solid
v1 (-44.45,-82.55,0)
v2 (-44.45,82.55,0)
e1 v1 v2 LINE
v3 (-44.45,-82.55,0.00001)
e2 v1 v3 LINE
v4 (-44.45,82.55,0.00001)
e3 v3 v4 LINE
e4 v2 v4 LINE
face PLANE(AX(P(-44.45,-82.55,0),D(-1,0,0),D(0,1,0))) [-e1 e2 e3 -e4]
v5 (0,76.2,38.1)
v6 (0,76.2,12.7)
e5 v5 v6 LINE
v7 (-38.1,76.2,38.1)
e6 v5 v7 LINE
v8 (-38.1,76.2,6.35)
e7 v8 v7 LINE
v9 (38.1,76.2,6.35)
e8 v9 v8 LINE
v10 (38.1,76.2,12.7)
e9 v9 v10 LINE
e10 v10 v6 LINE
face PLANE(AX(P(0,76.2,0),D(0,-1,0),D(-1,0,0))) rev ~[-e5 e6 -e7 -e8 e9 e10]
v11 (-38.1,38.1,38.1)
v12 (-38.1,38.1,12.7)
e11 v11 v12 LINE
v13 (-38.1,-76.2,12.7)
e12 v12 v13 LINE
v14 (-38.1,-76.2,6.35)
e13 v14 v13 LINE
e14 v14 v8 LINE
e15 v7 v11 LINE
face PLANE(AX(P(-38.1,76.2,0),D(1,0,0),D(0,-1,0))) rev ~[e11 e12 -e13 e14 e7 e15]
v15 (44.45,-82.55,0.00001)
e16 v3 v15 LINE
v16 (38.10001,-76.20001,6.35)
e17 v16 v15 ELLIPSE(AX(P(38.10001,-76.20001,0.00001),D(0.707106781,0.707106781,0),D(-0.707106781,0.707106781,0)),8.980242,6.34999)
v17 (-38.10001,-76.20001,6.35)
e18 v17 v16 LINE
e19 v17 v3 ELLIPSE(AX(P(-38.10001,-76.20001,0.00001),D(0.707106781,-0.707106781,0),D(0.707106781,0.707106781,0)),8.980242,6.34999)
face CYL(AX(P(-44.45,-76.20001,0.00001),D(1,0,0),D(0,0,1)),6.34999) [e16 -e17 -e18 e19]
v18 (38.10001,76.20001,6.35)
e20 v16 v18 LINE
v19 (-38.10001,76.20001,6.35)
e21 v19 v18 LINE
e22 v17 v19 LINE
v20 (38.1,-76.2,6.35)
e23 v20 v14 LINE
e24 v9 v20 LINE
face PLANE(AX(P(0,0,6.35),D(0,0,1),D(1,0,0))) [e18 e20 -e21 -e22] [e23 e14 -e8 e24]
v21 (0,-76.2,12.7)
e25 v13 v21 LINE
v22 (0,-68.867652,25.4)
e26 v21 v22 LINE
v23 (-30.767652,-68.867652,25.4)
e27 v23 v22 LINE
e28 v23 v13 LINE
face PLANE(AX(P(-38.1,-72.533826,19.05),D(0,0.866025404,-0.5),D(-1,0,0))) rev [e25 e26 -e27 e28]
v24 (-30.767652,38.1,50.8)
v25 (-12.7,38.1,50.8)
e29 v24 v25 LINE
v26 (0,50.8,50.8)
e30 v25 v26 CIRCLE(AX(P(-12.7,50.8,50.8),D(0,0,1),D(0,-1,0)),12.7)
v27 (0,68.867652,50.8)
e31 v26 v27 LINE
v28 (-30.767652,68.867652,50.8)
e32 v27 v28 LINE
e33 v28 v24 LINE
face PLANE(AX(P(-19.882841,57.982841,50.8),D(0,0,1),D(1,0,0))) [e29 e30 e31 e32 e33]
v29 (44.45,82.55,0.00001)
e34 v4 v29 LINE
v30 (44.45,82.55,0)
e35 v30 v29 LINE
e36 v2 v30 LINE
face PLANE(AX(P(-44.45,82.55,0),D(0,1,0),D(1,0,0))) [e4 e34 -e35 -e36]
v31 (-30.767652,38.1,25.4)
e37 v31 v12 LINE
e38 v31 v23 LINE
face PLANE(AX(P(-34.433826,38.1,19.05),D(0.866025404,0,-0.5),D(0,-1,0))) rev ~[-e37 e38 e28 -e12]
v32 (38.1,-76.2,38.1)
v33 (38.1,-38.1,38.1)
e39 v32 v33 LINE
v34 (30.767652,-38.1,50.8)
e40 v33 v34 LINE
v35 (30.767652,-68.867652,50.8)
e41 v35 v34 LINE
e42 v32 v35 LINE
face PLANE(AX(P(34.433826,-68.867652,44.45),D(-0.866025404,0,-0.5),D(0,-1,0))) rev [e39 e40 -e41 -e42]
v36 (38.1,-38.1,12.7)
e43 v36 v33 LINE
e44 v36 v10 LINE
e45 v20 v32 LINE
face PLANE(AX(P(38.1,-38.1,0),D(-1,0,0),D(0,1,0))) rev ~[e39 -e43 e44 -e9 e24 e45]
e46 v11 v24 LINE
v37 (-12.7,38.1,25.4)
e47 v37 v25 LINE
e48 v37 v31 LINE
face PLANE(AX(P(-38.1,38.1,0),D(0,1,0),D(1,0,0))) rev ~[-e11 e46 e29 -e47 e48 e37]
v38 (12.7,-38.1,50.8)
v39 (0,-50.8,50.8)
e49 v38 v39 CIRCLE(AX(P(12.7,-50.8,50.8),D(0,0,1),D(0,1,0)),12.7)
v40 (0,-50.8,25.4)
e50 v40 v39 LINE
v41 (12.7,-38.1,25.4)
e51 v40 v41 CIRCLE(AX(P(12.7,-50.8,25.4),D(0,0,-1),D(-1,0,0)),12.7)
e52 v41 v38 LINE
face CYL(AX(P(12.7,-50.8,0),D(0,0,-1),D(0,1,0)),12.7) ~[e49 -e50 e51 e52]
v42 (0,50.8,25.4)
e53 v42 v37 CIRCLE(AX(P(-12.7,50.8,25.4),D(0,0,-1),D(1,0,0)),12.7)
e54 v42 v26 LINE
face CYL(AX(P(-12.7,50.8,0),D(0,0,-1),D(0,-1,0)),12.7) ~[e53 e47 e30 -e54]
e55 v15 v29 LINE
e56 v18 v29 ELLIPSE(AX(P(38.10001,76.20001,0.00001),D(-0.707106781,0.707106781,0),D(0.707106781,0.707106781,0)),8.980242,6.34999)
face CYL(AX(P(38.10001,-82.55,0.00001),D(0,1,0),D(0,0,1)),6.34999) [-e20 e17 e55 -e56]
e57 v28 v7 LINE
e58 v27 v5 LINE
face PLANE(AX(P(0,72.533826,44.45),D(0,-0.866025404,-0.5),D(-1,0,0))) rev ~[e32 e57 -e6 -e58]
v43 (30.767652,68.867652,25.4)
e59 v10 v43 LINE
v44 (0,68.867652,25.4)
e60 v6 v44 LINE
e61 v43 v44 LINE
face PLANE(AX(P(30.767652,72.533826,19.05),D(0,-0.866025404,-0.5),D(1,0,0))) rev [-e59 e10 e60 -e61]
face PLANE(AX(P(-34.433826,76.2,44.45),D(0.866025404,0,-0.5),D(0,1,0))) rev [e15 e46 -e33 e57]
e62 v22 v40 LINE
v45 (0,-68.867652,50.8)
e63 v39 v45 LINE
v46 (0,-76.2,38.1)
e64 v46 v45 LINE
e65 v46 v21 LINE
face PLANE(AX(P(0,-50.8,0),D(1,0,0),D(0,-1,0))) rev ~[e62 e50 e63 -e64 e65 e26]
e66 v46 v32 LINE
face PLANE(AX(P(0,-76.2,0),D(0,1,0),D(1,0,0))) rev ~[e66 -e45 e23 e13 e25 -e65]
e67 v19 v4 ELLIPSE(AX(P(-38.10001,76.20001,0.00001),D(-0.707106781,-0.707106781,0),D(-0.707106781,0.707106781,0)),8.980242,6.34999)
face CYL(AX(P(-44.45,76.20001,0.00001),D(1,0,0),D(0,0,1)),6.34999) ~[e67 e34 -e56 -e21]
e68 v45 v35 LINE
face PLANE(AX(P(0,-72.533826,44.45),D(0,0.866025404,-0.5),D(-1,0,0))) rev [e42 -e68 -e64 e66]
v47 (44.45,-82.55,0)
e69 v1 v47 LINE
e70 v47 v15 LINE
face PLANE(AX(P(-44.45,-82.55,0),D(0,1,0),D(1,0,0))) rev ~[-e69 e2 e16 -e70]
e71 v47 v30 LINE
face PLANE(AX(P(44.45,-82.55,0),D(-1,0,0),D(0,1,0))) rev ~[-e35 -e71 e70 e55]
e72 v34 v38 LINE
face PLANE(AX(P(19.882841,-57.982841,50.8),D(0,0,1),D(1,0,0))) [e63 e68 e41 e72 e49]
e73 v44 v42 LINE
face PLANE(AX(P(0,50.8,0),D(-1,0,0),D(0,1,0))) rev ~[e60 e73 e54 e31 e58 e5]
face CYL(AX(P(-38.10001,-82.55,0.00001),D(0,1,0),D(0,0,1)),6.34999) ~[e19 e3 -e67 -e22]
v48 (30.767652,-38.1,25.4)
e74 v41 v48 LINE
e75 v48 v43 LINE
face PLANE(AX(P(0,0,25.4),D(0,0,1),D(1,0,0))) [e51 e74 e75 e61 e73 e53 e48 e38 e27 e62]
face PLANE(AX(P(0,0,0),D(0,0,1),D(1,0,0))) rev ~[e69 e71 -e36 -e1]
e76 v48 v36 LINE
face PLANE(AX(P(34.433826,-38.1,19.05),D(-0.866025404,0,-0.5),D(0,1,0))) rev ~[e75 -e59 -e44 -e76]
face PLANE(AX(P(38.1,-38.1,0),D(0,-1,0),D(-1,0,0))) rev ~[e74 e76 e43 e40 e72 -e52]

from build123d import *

# Parameters (mm, degrees)
F0_W        = 88.9000007987
F0_H        = 165.1000007987
F1_DEPTH    = 6.35
F2_DEPTH    = 25.4
F3_DEPTH    = 50.8
F4_C1_SIZE2 = 7.3323484187
F4_C1_SIZE  = 12.7
F4_C2_SIZE2 = 7.3323484187
F4_C2_SIZE  = 12.7
F4_C3_SIZE2 = 7.3323484187
F4_C3_SIZE  = 12.7
F4_C4_SIZE2 = 12.7
F4_C4_SIZE  = 7.3323484187
F4_C5_SIZE2 = 7.3323484187
F4_C5_SIZE  = 12.7
F5_C1_SIZE2 = 12.7
F5_C1_SIZE  = 7.3323484187
F5_C2_SIZE2 = 12.7
F5_C2_SIZE  = 7.3323484187
F5_C3_SIZE2 = 7.3323484187
F5_C3_SIZE  = 12.7
F6_R        = 6.34999


# Not quite as in the source:
# - a fillet or chamfer is up to 0.001 mm smaller than in the source, because OpenCascade refuses the exact size


with BuildPart() as f1:
    # F0 (on Top) → F1 (new body)
    with BuildSketch(Plane.XY):
        Rectangle(F0_W, F0_H)
        Polygon((-38.1, 38.1), (-38.1, 76.2), (0, 76.2), (38.1, 76.2), (38.1, -38.1), (38.1, -76.2), (0, -76.2), (-38.1, -76.2), align=None, mode=Mode.SUBTRACT)
    extrude(amount=F1_DEPTH)

    # F0 (on Top) → F2 (join)
    with BuildSketch(Plane.XY):
        with BuildLine():
            Line((38.1, 76.2), (0, 76.2))
            Line((0, 76.2), (0, 50.8))
            ThreePointArc((0, 50.8), (-3.7197438789, 41.8197438789), (-12.7, 38.1))
            Line((-12.7, 38.1), (-38.1, 38.1))
            Line((-38.1, 38.1), (-38.1, -76.2))
            Line((-38.1, -76.2), (0, -76.2))
            Line((0, -76.2), (0, -50.8))
            ThreePointArc((0, -50.8), (3.7197438789, -41.8197438789), (12.7, -38.1))
            Line((12.7, -38.1), (38.1, -38.1))
            Line((38.1, -38.1), (38.1, 76.2))
        make_face()
    extrude(amount=F2_DEPTH)

    # F0 (on Top) → F3 (join)
    with BuildSketch(Plane.XY):
        with BuildLine():
            Line((0, 76.2), (-38.1, 76.2))
            Line((-38.1, 76.2), (-38.1, 38.1))
            Line((-38.1, 38.1), (-12.7, 38.1))
            ThreePointArc((-12.7, 38.1), (-3.7197438789, 41.8197438789), (0, 50.8))
            Line((0, 50.8), (0, 76.2))
        make_face()
        with BuildLine():
            Line((38.1, -76.2), (38.1, -38.1))
            Line((38.1, -38.1), (12.7, -38.1))
            ThreePointArc((12.7, -38.1), (3.7197438789, -41.8197438789), (0, -50.8))
            Line((0, -50.8), (0, -76.2))
            Line((0, -76.2), (38.1, -76.2))
        make_face()
    extrude(amount=F3_DEPTH)

    # F4: chamfer of 12.7 x 7.3323484187 on 5 edges, made by hand

    # F4_c1
    f4_c1_edges = [f1.edges().sort_by_distance(p)[0] for p in [
        (-19.05, -76.2, 25.4),
    ]]
    f4_c1_side = f1.faces().sort_by_distance((-19.05, -76.2, 25.2533530316))[0]
    chamfer(f4_c1_edges, length=F4_C1_SIZE, length2=F4_C1_SIZE2, reference=f4_c1_side)

    # F4_c2
    f4_c2_edges = [f1.edges().sort_by_distance(p)[0] for p in [
        (19.05, -76.2, 50.8),
    ]]
    f4_c2_side = f1.faces().sort_by_distance((19.05, -76.2, 50.6533530316))[0]
    chamfer(f4_c2_edges, length=F4_C2_SIZE, length2=F4_C2_SIZE2, reference=f4_c2_side)

    # F4_c3
    f4_c3_edges = [f1.edges().sort_by_distance(p)[0] for p in [
        (38.1, -53.4838257906, 50.8),
    ]]
    f4_c3_side = f1.faces().sort_by_distance((38.1, -53.4838257906, 50.6533530316))[0]
    chamfer(f4_c3_edges, length=F4_C3_SIZE, length2=F4_C3_SIZE2, reference=f4_c3_side)

    # F4_c4
    f4_c4_edges = [f1.edges().sort_by_distance(p)[0] for p in [
        (-38.1, -15.3838257906, 25.4),
    ]]
    f4_c4_side = f1.faces().sort_by_distance((-37.9533530316, -15.3838257906, 25.4))[0]
    chamfer(f4_c4_edges, length=F4_C4_SIZE, length2=F4_C4_SIZE2, reference=f4_c4_side)

    # F4_c5
    f4_c5_edges = [f1.edges().sort_by_distance(p)[0] for p in [
        (-38.1, 57.15, 50.8),
    ]]
    f4_c5_side = f1.faces().sort_by_distance((-38.1, 57.15, 50.6533530316))[0]
    chamfer(f4_c5_edges, length=F4_C5_SIZE, length2=F4_C5_SIZE2, reference=f4_c5_side)

    # F5: chamfer of 12.7 x 7.3323484187 on 3 edges, made by hand

    # F5_c1
    f5_c1_edges = [f1.edges().sort_by_distance(p)[0] for p in [
        (-15.3838257906, 76.2, 50.8),
    ]]
    f5_c1_side = f1.faces().sort_by_distance((-15.3838257906, 76.0533530316, 50.8))[0]
    chamfer(f5_c1_edges, length=F5_C1_SIZE, length2=F5_C1_SIZE2, reference=f5_c1_side)

    # F5_c2
    f5_c2_edges = [f1.edges().sort_by_distance(p)[0] for p in [
        (38.1, 19.05, 25.4),
    ]]
    f5_c2_side = f1.faces().sort_by_distance((37.9533530316, 19.05, 25.4))[0]
    chamfer(f5_c2_edges, length=F5_C2_SIZE, length2=F5_C2_SIZE2, reference=f5_c2_side)

    # F5_c3
    f5_c3_edges = [f1.edges().sort_by_distance(p)[0] for p in [
        (15.3838257906, 76.2, 25.4),
    ]]
    f5_c3_side = f1.faces().sort_by_distance((15.3838257906, 76.2, 25.2533530316))[0]
    chamfer(f5_c3_edges, length=F5_C3_SIZE, length2=F5_C3_SIZE2, reference=f5_c3_side)

    # F6 (radius 6.35 in the source; OpenCascade refuses exactly that, so slightly less here)
    f6_edges = [f1.edges().sort_by_distance(p)[0] for p in [
        (44.45, 0, 6.35),
        (0, -82.55, 6.35),
        (-44.45, 0, 6.35),
        (0, 82.55, 6.35),
    ]]
    fillet(f6_edges, radius=F6_R)


solid = f1.part
